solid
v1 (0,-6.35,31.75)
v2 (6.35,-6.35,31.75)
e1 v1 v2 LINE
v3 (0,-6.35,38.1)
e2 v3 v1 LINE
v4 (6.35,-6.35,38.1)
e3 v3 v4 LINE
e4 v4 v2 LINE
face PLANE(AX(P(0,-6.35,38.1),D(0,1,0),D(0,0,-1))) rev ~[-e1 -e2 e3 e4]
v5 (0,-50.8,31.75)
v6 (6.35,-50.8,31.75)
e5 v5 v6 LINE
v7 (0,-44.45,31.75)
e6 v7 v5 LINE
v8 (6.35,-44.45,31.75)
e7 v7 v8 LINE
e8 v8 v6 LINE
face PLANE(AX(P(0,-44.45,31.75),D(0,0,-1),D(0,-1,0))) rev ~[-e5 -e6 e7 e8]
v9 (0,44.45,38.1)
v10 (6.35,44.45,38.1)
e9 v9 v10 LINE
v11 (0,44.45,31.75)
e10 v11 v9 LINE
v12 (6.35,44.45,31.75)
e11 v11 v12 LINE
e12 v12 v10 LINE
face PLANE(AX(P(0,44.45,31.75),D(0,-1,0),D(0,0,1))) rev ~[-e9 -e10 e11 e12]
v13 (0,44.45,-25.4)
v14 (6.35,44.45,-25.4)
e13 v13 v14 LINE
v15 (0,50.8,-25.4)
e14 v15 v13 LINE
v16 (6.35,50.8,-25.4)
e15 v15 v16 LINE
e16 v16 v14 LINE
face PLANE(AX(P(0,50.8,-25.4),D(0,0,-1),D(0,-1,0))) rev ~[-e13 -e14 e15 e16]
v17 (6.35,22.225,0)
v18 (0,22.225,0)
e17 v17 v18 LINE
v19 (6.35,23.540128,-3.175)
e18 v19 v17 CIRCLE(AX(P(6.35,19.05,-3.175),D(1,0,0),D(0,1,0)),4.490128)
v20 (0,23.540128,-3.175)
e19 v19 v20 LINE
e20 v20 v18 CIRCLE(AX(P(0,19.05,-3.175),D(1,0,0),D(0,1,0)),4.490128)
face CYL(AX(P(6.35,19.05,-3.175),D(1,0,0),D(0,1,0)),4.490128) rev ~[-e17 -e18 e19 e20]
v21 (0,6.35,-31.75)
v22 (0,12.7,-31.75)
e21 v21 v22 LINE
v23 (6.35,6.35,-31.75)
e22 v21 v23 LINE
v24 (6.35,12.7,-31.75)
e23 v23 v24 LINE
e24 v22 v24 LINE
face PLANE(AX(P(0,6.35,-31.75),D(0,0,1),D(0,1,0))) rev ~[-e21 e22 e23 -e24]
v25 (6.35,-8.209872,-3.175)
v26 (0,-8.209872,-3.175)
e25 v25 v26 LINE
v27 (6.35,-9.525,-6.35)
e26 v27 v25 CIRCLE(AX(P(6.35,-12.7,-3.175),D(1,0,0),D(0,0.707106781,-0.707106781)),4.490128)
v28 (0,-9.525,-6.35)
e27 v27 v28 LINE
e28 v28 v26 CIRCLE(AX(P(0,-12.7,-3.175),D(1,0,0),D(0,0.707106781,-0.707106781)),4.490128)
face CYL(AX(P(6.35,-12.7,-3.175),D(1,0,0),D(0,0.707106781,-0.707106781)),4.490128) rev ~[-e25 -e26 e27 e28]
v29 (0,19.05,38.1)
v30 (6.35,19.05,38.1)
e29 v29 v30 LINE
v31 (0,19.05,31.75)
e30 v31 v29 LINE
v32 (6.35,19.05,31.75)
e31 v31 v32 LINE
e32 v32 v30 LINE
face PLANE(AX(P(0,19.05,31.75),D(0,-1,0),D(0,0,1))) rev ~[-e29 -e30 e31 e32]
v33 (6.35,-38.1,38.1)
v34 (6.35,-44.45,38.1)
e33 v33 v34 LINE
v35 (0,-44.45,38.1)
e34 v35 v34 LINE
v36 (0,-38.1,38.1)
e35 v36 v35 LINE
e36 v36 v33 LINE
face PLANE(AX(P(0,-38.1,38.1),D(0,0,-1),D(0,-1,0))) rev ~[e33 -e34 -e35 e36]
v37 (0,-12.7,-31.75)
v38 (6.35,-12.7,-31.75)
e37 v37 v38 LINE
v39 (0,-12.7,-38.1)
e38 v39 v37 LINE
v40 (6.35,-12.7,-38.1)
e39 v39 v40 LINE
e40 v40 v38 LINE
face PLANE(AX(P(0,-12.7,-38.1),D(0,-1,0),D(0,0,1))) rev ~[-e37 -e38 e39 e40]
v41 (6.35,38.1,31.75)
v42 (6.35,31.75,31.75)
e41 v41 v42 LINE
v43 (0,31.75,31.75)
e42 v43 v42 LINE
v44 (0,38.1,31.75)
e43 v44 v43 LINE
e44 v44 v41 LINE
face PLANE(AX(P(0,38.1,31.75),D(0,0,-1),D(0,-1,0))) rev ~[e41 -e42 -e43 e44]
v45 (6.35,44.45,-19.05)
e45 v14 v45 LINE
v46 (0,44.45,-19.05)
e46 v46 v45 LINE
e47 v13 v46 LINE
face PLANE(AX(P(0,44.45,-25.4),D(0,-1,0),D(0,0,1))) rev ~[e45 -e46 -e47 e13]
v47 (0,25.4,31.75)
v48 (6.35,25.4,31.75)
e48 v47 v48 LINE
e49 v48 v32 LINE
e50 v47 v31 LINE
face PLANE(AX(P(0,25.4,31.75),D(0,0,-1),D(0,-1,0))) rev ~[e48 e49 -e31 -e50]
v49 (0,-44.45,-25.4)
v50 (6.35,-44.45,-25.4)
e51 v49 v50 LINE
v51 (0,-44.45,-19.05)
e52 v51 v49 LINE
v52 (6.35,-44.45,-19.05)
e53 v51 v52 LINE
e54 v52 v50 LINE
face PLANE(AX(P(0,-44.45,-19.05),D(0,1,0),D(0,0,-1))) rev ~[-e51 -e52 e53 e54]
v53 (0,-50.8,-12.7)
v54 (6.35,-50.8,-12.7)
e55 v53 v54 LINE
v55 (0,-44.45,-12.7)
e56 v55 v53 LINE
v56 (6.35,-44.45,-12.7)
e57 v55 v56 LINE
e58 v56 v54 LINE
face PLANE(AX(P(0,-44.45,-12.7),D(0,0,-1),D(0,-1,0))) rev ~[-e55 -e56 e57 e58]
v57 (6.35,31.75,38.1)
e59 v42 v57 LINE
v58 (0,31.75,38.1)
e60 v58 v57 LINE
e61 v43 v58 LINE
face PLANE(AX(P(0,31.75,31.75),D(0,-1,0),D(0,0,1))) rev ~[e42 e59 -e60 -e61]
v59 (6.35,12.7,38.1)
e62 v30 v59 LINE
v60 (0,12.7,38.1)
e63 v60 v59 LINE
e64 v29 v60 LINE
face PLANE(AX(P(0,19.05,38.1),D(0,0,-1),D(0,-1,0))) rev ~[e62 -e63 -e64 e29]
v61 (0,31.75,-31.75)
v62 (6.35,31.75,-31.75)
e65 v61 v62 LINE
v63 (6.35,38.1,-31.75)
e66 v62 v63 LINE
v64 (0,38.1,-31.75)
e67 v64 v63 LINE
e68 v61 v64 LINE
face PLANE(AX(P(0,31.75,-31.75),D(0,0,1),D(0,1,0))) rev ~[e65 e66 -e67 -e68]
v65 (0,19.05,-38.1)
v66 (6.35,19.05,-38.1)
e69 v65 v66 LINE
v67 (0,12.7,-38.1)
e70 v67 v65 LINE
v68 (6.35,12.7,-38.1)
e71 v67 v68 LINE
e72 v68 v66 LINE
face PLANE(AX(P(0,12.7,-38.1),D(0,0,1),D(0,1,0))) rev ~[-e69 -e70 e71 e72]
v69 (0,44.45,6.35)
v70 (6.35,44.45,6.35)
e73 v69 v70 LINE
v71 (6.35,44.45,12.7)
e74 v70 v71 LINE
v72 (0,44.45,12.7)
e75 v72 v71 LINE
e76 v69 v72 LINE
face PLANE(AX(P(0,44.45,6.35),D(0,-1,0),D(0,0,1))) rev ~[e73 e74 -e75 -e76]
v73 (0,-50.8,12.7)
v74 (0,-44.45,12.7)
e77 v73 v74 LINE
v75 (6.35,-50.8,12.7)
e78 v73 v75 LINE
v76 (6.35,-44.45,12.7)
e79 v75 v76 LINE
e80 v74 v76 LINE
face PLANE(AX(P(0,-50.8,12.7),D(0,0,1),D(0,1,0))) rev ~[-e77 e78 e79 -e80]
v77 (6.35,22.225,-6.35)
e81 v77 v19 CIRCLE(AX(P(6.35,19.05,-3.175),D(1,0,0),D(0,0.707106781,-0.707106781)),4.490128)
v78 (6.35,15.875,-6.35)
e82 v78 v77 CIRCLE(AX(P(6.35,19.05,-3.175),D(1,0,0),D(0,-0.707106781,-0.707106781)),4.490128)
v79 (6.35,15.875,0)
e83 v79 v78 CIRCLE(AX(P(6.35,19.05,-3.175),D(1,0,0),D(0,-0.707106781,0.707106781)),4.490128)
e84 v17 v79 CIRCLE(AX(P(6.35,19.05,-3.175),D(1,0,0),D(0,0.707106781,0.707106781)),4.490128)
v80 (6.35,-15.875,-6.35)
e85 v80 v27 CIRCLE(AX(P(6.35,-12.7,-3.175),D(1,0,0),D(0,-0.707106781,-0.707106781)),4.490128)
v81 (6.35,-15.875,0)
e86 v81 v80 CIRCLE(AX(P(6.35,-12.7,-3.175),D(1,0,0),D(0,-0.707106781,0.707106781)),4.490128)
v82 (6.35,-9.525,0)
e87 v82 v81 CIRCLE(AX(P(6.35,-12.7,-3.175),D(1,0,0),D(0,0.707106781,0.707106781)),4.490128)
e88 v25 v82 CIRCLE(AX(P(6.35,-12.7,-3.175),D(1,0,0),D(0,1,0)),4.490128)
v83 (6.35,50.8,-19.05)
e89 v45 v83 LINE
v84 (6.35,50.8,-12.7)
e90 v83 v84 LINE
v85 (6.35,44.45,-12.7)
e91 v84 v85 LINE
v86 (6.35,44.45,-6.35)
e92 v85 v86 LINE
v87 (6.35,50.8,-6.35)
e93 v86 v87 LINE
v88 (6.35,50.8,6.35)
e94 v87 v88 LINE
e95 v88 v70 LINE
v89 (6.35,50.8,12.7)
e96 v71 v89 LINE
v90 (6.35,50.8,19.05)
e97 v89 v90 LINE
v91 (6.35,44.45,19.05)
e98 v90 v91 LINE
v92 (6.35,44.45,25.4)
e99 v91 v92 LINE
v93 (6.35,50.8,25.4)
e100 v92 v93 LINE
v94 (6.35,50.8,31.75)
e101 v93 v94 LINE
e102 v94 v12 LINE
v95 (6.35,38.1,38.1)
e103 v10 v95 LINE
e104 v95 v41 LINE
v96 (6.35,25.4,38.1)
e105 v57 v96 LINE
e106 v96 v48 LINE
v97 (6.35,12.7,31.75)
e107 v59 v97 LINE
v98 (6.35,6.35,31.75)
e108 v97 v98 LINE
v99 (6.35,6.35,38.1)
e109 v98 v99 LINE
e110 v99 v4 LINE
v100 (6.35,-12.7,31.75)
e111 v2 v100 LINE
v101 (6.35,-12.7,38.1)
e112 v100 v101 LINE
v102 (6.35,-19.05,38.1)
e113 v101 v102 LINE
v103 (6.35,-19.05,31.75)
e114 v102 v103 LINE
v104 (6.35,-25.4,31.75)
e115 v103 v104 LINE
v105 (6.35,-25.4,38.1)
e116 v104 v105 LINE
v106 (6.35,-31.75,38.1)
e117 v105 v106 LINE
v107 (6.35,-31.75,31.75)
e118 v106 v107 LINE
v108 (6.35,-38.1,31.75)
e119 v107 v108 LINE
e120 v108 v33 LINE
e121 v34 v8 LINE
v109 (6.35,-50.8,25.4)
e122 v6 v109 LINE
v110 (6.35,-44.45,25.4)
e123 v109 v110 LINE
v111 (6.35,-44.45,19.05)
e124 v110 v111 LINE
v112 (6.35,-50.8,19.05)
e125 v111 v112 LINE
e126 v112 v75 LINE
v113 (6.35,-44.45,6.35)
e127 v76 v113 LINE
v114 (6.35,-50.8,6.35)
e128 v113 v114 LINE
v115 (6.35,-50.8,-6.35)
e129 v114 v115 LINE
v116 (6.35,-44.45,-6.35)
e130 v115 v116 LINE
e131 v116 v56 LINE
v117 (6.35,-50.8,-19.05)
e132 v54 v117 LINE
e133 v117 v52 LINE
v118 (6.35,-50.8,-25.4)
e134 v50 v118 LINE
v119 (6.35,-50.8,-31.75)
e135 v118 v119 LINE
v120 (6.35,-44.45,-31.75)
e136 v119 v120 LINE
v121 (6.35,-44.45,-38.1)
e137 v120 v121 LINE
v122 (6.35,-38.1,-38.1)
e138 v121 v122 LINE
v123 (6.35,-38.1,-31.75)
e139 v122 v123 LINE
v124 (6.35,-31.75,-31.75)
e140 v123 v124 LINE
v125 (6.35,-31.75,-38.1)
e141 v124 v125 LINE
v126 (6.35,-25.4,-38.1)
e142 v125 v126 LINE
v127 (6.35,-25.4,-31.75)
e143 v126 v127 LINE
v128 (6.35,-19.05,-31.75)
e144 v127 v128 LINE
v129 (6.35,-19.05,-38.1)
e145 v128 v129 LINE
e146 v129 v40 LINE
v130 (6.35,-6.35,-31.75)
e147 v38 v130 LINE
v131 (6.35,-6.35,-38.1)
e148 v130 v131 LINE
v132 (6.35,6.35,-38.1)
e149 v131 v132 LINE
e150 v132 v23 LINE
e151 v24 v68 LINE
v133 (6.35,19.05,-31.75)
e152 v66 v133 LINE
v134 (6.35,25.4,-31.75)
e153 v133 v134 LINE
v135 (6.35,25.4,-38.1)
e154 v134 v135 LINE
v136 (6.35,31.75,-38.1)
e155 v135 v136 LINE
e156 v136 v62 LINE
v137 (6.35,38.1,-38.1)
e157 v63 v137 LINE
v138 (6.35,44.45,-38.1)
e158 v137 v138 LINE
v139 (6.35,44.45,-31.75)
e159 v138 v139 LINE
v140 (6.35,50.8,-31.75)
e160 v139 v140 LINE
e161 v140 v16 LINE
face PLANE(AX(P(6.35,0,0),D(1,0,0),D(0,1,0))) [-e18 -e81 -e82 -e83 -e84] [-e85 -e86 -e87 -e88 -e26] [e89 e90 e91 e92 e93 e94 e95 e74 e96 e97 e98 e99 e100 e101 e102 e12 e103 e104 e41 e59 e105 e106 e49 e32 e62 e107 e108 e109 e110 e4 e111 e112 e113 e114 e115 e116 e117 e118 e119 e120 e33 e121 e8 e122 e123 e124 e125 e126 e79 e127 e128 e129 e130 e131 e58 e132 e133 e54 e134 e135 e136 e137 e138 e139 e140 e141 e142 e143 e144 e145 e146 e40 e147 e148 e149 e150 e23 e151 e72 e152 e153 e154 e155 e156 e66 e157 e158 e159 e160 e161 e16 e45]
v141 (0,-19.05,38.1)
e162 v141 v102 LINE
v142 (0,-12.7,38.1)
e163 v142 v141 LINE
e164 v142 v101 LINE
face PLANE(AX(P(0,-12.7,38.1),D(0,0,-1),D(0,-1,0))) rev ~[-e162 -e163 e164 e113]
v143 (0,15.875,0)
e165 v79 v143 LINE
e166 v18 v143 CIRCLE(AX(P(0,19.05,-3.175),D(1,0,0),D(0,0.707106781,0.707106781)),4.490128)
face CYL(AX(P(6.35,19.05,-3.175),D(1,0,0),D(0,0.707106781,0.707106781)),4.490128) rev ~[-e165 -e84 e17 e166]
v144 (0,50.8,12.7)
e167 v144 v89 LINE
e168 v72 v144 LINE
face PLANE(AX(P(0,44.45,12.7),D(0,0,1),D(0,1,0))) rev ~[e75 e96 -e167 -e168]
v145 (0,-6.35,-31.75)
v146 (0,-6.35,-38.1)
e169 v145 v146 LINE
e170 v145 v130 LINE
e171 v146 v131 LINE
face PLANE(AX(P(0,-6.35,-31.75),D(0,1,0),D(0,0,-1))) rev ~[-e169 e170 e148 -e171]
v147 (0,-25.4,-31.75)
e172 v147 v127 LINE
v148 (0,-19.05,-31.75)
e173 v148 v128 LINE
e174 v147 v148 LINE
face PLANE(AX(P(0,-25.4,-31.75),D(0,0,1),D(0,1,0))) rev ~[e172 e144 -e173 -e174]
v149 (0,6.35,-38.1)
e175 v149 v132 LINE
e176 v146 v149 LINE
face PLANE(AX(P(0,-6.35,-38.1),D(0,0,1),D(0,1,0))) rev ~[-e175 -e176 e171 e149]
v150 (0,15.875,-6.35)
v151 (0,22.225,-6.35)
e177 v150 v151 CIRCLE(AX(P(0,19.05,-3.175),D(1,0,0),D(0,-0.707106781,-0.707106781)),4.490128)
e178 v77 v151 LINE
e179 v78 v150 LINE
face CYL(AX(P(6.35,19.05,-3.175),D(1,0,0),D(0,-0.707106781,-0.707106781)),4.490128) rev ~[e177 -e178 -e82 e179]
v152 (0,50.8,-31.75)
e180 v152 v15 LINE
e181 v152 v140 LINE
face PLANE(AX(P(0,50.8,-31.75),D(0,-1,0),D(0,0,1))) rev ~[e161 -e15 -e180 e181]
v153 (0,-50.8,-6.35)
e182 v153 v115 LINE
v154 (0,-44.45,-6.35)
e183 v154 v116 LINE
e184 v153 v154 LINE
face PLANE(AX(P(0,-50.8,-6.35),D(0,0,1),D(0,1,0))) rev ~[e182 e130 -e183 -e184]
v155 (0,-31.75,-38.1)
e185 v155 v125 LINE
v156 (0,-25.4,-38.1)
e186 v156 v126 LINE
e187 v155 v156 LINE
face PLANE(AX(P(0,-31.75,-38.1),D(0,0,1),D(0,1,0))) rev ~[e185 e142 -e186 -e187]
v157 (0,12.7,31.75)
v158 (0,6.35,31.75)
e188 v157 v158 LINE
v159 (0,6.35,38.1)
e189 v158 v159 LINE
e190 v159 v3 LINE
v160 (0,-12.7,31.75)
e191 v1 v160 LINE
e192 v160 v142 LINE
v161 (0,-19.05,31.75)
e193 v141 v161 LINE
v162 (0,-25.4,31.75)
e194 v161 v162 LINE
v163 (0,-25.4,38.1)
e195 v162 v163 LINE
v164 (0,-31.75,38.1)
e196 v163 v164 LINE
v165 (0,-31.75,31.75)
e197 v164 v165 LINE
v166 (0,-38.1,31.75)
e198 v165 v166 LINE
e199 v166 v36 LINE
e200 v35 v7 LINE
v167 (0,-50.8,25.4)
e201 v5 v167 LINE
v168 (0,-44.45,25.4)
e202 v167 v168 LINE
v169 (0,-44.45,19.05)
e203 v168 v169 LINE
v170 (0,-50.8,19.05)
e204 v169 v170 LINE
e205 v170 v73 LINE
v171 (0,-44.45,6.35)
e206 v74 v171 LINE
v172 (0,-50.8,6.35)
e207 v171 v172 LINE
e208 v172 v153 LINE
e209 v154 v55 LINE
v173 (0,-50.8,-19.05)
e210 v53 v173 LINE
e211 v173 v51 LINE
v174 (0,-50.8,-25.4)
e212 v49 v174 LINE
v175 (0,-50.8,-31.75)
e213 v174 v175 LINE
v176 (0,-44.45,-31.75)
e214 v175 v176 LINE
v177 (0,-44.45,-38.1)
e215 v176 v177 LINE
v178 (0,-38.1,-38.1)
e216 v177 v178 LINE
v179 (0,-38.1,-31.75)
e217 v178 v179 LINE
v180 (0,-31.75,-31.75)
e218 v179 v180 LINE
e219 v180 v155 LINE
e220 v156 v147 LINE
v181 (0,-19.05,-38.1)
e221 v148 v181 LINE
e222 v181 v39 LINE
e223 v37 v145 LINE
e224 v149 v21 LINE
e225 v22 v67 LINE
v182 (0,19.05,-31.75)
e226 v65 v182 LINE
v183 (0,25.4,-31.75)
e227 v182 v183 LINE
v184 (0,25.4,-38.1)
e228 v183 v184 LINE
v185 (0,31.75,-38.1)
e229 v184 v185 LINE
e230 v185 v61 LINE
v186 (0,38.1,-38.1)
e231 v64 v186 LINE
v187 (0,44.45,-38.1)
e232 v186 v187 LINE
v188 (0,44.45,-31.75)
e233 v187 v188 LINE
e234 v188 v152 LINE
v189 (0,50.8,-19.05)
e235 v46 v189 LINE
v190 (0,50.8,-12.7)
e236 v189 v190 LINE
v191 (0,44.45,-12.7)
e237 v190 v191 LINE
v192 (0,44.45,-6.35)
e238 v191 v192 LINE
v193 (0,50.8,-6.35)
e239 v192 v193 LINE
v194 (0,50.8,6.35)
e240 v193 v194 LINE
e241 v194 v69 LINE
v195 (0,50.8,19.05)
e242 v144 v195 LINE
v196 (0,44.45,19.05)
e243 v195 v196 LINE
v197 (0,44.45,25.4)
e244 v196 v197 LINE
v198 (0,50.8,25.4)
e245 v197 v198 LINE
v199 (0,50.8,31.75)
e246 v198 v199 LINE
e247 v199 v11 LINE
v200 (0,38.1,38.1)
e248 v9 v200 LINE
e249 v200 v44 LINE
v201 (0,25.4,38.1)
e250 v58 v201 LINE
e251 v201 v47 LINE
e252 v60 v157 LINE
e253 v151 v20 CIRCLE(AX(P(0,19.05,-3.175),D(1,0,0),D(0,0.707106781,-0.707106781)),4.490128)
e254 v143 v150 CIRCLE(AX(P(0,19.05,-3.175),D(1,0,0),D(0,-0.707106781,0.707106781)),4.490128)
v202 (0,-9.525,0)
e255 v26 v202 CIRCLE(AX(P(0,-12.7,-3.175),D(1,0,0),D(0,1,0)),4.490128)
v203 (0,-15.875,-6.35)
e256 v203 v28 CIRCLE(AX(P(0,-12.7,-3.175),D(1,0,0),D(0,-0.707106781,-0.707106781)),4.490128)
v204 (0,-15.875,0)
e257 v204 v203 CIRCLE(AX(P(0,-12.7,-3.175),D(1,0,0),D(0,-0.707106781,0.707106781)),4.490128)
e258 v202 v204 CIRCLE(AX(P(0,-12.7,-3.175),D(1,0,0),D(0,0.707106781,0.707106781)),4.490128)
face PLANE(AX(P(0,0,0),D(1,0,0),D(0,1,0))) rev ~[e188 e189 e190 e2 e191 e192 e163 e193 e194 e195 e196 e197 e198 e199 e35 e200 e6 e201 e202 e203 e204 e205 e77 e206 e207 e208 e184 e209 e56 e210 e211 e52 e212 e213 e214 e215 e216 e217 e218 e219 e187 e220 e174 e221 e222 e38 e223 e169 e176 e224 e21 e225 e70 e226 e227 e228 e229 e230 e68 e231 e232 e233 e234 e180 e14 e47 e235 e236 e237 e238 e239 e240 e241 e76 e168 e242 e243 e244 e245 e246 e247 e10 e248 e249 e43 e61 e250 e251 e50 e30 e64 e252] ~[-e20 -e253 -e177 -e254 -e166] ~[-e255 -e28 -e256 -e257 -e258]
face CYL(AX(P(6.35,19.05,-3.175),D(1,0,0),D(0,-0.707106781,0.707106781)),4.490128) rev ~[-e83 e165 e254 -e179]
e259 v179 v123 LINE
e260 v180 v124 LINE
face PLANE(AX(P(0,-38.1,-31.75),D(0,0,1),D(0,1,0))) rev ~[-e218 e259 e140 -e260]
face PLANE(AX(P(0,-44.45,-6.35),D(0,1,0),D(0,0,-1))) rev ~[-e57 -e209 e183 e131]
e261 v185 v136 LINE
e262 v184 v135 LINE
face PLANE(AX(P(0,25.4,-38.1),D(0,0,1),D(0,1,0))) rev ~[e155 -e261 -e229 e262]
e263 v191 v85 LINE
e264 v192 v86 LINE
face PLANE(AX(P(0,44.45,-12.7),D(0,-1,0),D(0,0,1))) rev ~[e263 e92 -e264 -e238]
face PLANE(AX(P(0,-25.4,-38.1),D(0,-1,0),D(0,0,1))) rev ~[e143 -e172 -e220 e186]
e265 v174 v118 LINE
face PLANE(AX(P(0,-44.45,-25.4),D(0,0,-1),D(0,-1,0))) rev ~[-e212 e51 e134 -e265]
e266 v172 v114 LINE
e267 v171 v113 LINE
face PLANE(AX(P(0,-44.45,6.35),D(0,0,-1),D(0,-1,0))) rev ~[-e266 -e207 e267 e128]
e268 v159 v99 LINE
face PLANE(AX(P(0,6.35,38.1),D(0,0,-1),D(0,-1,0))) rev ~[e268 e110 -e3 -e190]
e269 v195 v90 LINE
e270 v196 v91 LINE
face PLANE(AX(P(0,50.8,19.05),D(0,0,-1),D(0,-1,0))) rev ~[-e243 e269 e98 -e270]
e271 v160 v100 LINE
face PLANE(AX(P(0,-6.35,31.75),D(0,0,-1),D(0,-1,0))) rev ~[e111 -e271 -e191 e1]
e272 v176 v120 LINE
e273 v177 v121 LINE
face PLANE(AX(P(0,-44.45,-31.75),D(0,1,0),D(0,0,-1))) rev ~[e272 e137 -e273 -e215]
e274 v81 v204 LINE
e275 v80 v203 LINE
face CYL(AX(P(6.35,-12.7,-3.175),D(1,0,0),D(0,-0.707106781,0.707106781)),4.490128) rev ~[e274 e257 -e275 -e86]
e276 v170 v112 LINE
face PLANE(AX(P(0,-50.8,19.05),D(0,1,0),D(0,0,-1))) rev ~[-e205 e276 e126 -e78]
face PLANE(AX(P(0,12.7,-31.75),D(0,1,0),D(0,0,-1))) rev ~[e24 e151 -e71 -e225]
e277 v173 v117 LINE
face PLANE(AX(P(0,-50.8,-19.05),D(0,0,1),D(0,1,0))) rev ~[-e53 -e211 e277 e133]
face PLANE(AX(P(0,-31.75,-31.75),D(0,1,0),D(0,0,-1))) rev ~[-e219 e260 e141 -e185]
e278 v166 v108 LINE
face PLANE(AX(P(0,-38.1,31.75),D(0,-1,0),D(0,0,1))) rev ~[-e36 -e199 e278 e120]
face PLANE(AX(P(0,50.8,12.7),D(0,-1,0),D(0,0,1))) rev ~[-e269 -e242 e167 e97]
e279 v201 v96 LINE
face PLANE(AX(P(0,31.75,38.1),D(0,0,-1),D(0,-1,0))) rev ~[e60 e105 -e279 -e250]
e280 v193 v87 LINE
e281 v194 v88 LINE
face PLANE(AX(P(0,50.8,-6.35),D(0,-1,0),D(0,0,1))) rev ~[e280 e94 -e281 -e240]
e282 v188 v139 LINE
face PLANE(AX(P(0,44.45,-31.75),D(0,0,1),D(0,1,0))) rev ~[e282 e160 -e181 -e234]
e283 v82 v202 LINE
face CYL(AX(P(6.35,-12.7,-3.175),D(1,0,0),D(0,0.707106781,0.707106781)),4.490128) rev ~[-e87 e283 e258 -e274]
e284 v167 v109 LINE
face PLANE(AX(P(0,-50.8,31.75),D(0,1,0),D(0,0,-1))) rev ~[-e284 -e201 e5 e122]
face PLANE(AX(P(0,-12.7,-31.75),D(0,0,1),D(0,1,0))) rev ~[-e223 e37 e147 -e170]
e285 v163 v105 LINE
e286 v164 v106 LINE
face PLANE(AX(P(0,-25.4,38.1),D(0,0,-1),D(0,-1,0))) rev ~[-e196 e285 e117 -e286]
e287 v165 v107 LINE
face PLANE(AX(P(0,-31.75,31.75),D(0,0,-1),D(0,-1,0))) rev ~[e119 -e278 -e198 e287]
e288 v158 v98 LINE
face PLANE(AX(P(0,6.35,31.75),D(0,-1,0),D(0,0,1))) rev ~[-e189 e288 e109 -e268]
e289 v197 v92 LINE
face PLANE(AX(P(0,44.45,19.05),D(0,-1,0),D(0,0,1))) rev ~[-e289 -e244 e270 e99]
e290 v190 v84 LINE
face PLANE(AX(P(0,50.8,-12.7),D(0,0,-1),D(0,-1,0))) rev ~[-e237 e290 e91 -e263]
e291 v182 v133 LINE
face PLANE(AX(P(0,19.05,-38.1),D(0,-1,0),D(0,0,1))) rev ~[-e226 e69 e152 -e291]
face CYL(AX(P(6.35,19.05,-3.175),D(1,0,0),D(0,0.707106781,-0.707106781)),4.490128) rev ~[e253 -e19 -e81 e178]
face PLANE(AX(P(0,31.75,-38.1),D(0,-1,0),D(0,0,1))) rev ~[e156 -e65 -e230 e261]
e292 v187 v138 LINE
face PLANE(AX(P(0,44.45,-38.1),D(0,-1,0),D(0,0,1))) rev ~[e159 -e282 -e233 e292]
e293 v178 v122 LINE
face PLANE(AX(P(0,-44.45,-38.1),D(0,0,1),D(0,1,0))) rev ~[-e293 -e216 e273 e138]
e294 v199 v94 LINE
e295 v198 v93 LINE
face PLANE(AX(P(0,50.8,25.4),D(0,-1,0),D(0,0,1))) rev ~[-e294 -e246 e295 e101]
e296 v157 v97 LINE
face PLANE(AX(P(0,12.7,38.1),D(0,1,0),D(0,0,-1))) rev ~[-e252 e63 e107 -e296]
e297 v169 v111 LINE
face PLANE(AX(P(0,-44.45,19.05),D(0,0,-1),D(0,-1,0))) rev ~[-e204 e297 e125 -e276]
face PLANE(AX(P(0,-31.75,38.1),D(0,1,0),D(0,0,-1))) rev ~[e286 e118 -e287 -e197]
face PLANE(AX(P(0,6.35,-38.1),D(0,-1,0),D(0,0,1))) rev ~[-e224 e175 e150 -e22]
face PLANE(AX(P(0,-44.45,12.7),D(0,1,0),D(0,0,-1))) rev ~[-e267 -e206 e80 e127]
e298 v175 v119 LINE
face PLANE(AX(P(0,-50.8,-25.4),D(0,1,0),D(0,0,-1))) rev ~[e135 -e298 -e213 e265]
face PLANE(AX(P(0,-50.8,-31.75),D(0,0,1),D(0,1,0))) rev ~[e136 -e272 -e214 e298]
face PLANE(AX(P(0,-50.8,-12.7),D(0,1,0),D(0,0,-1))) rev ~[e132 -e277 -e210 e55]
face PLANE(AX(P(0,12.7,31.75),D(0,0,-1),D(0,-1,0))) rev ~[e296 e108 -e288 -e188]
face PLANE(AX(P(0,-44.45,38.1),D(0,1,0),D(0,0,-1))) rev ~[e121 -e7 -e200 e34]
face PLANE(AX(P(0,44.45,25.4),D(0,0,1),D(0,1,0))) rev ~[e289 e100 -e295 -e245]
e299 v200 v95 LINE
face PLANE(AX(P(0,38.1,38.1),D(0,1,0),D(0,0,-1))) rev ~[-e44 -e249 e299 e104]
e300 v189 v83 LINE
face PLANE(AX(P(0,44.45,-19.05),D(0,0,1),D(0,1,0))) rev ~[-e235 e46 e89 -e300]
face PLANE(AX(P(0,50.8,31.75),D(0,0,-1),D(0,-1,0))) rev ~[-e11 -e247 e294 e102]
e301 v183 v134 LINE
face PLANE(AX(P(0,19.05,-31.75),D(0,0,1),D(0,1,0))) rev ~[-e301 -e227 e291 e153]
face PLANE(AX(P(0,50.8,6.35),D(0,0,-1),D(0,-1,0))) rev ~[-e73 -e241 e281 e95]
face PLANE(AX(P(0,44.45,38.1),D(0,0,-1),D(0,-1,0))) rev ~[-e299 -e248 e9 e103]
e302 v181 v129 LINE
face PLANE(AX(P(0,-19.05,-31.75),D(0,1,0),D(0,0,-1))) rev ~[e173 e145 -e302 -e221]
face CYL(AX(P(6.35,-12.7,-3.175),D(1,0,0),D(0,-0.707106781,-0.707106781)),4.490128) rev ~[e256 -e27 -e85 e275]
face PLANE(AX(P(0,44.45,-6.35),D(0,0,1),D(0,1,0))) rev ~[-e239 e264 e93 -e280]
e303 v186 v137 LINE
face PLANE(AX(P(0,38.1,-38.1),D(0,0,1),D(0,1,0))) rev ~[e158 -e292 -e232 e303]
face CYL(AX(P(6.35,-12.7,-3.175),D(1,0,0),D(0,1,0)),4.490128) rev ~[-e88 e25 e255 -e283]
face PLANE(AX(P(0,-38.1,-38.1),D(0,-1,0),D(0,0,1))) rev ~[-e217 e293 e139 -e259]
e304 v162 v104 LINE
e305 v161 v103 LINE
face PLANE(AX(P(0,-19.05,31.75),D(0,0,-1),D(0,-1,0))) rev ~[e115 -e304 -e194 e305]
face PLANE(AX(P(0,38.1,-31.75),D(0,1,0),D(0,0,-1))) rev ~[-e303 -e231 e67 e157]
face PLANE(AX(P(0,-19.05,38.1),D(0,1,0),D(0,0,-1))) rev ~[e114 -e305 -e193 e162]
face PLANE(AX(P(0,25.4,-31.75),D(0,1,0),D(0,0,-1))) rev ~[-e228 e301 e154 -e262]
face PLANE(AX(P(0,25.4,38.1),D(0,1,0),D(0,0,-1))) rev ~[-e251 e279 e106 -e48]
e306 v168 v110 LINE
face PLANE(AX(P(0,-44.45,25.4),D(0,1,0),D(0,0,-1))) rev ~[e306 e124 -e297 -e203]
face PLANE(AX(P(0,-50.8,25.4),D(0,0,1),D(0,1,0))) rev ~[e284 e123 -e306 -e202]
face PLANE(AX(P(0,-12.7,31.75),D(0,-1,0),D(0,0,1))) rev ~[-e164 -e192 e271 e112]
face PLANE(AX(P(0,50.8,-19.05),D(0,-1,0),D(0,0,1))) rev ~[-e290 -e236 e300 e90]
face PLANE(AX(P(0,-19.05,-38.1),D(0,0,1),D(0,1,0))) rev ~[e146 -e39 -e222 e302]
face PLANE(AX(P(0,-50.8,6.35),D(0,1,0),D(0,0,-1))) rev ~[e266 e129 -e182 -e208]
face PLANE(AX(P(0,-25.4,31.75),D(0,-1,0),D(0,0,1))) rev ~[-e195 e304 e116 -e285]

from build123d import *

# Parameters (mm, degrees)
F1_DEPTH = 6.35
F2_W     = 6.35
F2_H     = 6.35
F3_DEPTH = 6.351


with BuildPart() as f1:
    # F0 (on Right) → F1 (new body)
    with BuildSketch(Plane.YZ):
        Polygon((-38.1, 38.1), (-44.45, 38.1), (-44.45, 31.75), (-50.8, 31.75), (-50.8, 25.4), (-44.45, 25.4), (-44.45, 19.05), (-50.8, 19.05), (-50.8, 12.7), (-44.45, 12.7), (-44.45, 6.35), (-50.8, 6.35), (-50.8, 0), (-50.8, -6.35), (-44.45, -6.35), (-44.45, -12.7), (-50.8, -12.7), (-50.8, -19.05), (-44.45, -19.05), (-44.45, -25.4), (-50.8, -25.4), (-50.8, -31.75), (-44.45, -31.75), (-44.45, -38.1), (-38.1, -38.1), (-38.1, -31.75), (-31.75, -31.75), (-31.75, -38.1), (-25.4, -38.1), (-25.4, -31.75), (-19.05, -31.75), (-19.05, -38.1), (-12.7, -38.1), (-12.7, -31.75), (-6.35, -31.75), (-6.35, -38.1), (0, -38.1), (6.35, -38.1), (6.35, -31.75), (12.7, -31.75), (12.7, -38.1), (19.05, -38.1), (19.05, -31.75), (25.4, -31.75), (25.4, -38.1), (31.75, -38.1), (31.75, -31.75), (38.1, -31.75), (38.1, -38.1), (44.45, -38.1), (44.45, -31.75), (50.8, -31.75), (50.8, -25.4), (44.45, -25.4), (44.45, -19.05), (50.8, -19.05), (50.8, -12.7), (44.45, -12.7), (44.45, -6.35), (50.8, -6.35), (50.8, 0), (50.8, 6.35), (44.45, 6.35), (44.45, 12.7), (50.8, 12.7), (50.8, 19.05), (44.45, 19.05), (44.45, 25.4), (50.8, 25.4), (50.8, 31.75), (44.45, 31.75), (44.45, 38.1), (38.1, 38.1), (38.1, 31.75), (31.75, 31.75), (31.75, 38.1), (25.4, 38.1), (25.4, 31.75), (19.05, 31.75), (19.05, 38.1), (12.7, 38.1), (12.7, 31.75), (6.35, 31.75), (6.35, 38.1), (0, 38.1), (-6.35, 38.1), (-6.35, 31.75), (-12.7, 31.75), (-12.7, 38.1), (-19.05, 38.1), (-19.05, 31.75), (-25.4, 31.75), (-25.4, 38.1), (-31.75, 38.1), (-31.75, 31.75), (-38.1, 31.75), align=None)
    extrude(amount=F1_DEPTH)

    # F2 (on face) → F3 (cut, through all)
    with BuildSketch(Plane.YZ.offset(6.35)):
        with BuildLine():
            ThreePointArc((-15.875, -6.35), (-12.7, -7.6651280605), (-9.525, -6.35))
            Line((-9.525, -6.35), (-15.875, -6.35))
        make_face()
        Polygon((-15.875, -6.35), (-9.525, -6.35), (-9.525, -3.175), (-9.525, 0), (-15.875, 0), align=None)
        with BuildLine():
            Line((-9.525, -3.175), (-9.525, -6.35))
            ThreePointArc((-9.525, -6.35), (-8.5516625865, -4.893297618), (-8.2098719395, -3.175))
            ThreePointArc((-8.2098719395, -3.175), (-8.5516625865, -1.456702382), (-9.525, 0))
            Line((-9.525, 0), (-9.525, -3.175))
        make_face()
        with BuildLine():
            ThreePointArc((-15.875, 0), (-17.1901280605, -3.175), (-15.875, -6.35))
            Line((-15.875, -6.35), (-15.875, 0))
        make_face()
        with BuildLine():
            Line((-15.875, 0), (-9.525, 0))
            ThreePointArc((-9.525, 0), (-12.7, 1.3151280605), (-15.875, 0))
        make_face()
        with BuildLine():
            ThreePointArc((22.225, 0), (19.05, 1.3151280605), (15.875, 0))
            Line((15.875, 0), (22.225, 0))
        make_face()
        with Locations((19.05, -3.175)):
            Rectangle(F2_W, F2_H)
        with BuildLine():
            Line((15.875, -6.35), (15.875, 0))
            ThreePointArc((15.875, 0), (14.5598719395, -3.175), (15.875, -6.35))
        make_face()
        with BuildLine():
            ThreePointArc((23.5401280605, -3.175), (23.1983374135, -1.456702382), (22.225, 0))
            Line((22.225, 0), (22.225, -6.35))
            ThreePointArc((22.225, -6.35), (23.1983374135, -4.893297618), (23.5401280605, -3.175))
        make_face()
        with BuildLine():
            Line((22.225, -6.35), (15.875, -6.35))
            ThreePointArc((15.875, -6.35), (19.05, -7.6651280605), (22.225, -6.35))
        make_face()
    extrude(amount=-F3_DEPTH, mode=Mode.SUBTRACT)


solid = f1.part
